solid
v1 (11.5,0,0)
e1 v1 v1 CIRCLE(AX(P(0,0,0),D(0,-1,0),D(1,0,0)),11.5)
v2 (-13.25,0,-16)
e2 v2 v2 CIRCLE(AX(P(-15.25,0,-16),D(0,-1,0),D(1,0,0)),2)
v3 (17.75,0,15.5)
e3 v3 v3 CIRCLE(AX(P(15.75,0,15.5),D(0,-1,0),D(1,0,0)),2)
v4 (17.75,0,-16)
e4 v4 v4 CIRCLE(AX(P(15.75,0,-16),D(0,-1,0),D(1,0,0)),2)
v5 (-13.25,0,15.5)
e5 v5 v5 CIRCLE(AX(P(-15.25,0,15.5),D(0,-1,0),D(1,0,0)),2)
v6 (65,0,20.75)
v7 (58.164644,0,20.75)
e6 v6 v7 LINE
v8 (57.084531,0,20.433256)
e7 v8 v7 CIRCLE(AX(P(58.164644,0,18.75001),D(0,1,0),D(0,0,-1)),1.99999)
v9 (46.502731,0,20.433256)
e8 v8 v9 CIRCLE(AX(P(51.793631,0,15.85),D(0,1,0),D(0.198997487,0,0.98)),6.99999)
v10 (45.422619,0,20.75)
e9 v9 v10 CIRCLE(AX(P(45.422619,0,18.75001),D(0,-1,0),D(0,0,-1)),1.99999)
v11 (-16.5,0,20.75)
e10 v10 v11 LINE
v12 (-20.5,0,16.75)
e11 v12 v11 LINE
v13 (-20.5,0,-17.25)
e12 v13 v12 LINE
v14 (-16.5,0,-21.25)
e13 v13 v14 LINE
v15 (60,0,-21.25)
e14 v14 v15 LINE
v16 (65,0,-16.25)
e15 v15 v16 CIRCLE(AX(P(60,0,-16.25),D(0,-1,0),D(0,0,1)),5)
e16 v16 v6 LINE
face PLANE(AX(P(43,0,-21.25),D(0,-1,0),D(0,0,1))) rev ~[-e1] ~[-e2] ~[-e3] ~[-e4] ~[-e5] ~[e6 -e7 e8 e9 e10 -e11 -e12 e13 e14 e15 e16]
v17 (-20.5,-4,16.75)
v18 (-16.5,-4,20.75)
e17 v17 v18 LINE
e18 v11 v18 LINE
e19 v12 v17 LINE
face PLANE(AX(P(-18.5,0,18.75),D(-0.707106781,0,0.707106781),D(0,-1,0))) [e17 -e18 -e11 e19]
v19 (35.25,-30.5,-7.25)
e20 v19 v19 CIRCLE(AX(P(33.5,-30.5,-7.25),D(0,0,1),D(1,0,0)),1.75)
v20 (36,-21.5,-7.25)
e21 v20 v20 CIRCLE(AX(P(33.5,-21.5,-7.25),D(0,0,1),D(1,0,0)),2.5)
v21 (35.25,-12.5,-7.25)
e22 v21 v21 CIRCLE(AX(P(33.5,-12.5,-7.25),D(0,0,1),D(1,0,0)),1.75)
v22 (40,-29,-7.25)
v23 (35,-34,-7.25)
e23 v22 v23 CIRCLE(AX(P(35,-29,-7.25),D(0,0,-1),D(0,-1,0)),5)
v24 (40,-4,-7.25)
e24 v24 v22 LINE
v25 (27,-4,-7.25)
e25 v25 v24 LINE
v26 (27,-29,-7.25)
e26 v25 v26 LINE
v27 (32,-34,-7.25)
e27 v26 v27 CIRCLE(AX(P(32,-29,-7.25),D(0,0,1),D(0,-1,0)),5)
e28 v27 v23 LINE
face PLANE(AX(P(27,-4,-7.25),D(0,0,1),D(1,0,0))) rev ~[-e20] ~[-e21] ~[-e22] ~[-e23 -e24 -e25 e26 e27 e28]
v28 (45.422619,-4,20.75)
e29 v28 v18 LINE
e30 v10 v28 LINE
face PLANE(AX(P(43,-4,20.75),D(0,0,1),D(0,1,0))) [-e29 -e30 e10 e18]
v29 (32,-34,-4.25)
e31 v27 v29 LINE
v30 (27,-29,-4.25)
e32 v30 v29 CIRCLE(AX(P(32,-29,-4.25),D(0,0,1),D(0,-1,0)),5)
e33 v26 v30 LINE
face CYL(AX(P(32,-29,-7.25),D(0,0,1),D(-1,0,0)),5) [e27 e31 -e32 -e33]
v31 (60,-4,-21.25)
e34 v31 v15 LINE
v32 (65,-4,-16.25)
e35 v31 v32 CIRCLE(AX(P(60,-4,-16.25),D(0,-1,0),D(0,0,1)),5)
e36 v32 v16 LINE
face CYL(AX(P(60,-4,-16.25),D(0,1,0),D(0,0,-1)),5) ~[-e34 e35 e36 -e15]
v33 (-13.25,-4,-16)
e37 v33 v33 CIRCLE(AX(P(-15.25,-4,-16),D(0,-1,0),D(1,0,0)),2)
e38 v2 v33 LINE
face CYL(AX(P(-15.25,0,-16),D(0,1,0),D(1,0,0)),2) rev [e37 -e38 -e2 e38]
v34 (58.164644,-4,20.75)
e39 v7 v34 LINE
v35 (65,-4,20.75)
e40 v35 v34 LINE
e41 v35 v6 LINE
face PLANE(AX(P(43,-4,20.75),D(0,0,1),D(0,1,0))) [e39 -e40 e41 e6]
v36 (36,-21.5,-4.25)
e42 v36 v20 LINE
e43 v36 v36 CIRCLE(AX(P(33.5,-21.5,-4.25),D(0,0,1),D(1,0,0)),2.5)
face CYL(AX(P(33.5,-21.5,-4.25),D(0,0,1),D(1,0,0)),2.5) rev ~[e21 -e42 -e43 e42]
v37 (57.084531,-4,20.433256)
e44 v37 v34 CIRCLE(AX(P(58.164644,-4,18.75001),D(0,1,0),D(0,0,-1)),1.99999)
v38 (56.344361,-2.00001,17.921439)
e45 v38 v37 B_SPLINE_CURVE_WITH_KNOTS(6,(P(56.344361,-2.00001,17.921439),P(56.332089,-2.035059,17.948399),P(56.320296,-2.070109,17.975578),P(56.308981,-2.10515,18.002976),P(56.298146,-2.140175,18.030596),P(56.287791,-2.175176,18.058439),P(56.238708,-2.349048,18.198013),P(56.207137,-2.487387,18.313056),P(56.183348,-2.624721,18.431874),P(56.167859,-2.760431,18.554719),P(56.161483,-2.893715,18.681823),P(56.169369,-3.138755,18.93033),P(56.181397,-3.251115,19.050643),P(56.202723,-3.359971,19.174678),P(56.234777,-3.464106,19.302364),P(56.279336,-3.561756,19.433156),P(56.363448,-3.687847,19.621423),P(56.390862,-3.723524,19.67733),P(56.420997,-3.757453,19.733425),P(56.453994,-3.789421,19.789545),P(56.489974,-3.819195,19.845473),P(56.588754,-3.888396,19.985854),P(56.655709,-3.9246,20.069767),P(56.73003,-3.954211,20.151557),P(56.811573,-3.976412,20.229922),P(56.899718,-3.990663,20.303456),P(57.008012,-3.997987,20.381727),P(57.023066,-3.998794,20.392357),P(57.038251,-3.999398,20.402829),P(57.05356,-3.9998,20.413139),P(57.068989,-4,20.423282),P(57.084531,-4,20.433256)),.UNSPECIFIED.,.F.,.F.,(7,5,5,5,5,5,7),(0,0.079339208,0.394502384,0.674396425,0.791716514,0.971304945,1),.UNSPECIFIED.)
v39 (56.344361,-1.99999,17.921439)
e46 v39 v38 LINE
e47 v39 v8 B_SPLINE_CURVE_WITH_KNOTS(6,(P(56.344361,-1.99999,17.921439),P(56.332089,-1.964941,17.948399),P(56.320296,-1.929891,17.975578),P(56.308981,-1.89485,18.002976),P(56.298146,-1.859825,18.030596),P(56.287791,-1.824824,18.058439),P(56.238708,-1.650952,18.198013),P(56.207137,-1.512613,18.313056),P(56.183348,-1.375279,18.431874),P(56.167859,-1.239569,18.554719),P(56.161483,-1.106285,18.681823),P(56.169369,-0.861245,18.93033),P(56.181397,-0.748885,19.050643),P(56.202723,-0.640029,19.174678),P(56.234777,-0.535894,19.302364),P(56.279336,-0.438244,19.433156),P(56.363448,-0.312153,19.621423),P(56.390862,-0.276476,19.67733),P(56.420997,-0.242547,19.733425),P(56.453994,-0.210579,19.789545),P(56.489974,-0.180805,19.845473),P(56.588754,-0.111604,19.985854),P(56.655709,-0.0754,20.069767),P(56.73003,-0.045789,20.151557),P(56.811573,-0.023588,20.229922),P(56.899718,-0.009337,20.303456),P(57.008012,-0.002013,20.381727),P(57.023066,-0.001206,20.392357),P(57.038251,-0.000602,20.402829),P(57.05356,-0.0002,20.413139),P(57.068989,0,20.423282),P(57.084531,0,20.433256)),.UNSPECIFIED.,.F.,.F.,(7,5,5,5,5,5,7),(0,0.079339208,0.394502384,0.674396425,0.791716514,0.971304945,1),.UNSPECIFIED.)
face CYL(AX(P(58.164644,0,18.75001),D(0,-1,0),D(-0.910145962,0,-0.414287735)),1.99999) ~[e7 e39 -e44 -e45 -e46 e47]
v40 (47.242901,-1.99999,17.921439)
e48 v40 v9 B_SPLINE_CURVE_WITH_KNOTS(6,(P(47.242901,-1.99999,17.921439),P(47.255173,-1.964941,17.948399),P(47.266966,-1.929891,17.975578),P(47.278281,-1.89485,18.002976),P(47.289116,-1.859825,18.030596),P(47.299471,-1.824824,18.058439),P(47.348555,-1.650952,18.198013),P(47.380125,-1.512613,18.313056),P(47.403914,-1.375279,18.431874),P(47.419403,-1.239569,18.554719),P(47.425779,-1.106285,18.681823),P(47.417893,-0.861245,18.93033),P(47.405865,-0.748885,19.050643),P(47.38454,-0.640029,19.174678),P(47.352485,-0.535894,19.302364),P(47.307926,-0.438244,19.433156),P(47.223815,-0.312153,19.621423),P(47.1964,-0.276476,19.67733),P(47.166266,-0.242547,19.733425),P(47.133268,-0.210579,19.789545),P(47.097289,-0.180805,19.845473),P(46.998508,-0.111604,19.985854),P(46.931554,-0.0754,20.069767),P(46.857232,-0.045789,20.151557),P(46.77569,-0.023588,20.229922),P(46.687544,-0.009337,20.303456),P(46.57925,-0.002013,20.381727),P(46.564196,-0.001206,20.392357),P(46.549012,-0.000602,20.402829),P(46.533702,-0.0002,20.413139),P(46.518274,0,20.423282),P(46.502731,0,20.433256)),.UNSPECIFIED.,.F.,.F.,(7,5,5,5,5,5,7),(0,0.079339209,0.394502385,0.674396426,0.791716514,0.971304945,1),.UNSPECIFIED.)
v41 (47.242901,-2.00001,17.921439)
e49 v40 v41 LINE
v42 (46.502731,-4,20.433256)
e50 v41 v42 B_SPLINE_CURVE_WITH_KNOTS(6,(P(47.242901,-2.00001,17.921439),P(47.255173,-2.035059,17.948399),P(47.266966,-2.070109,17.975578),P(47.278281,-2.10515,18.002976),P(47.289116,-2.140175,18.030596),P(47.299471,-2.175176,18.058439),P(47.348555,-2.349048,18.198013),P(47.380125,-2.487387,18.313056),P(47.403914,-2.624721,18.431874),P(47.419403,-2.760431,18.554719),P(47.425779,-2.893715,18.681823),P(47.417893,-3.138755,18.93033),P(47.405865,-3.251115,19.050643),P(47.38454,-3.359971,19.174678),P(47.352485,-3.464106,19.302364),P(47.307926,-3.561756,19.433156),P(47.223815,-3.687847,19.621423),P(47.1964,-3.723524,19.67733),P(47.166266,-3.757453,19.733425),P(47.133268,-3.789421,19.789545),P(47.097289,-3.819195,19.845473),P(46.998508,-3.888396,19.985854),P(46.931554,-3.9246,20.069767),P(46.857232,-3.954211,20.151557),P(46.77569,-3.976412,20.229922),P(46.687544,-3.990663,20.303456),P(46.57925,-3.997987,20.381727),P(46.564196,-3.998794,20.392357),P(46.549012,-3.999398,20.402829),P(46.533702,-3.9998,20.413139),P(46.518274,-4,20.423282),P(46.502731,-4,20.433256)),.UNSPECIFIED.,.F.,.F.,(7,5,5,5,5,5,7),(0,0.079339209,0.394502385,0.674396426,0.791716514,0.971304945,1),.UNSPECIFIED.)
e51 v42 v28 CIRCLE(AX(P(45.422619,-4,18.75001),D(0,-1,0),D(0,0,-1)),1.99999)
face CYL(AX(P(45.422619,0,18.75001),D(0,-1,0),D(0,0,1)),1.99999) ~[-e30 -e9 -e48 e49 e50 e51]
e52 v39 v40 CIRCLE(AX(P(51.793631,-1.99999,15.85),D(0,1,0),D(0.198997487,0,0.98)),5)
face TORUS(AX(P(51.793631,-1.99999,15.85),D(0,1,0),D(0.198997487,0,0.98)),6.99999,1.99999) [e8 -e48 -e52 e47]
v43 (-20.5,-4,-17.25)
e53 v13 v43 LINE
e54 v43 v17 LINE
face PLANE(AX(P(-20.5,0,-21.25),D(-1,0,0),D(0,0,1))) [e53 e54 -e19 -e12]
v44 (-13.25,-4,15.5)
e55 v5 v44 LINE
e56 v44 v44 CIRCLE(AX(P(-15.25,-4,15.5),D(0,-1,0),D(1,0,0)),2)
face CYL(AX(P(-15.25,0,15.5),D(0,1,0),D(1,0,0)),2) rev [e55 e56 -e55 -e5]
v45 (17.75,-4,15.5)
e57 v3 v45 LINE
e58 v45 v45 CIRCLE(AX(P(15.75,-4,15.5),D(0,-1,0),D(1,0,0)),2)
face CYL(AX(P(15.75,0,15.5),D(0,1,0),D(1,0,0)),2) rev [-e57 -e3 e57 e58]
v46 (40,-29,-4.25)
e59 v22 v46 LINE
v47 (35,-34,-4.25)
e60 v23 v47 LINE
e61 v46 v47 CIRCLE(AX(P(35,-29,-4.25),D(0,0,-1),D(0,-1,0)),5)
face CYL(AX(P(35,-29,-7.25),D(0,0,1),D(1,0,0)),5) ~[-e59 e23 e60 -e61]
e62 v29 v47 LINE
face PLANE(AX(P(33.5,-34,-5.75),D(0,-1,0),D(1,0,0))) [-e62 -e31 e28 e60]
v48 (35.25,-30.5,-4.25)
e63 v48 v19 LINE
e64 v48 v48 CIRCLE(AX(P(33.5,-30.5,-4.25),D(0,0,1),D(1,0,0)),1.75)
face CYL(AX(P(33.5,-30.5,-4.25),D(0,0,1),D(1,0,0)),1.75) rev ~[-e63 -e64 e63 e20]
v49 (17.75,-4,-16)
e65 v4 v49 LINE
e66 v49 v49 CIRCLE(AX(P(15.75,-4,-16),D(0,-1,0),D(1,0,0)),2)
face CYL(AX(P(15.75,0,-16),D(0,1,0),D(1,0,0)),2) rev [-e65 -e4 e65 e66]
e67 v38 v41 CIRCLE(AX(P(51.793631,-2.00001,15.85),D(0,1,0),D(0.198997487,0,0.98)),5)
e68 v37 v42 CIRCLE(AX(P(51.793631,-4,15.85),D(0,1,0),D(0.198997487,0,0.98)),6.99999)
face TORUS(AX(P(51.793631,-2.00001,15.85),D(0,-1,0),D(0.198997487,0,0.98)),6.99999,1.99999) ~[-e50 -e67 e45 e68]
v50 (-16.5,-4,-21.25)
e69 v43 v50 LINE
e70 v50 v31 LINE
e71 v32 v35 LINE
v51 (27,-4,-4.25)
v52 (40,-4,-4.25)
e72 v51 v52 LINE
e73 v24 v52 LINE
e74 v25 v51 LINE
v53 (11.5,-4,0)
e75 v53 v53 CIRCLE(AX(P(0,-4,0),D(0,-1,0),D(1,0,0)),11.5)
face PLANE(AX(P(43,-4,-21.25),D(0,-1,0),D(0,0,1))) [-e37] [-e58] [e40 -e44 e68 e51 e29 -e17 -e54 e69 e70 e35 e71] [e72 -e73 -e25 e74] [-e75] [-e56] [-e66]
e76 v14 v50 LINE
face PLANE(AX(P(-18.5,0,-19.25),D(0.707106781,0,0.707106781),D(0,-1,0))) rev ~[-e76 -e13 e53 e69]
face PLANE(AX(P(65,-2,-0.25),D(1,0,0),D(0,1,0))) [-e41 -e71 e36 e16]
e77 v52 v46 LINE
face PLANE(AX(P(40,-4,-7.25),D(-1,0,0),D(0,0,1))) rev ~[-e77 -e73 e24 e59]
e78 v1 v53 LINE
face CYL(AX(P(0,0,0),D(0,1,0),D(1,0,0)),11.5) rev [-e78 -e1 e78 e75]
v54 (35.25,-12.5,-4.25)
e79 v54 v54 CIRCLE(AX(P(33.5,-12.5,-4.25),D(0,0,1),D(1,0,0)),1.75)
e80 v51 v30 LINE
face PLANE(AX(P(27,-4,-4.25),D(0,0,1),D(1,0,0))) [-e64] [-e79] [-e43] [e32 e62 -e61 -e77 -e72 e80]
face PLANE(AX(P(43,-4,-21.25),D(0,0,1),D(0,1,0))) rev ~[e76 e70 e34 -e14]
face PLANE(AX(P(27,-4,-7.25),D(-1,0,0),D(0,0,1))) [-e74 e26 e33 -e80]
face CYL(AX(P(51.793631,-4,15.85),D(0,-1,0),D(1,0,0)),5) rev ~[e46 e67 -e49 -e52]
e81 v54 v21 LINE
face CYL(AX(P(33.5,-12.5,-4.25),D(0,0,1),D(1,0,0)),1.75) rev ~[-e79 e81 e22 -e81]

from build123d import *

# Parameters (mm, degrees)
F0_W      = 63.5
F0_H      = 42
F0_R      = 2
F0_R_2    = 11.5
F1_DEPTH  = 4
F2_SIZE   = 4
F3_W      = 13
F3_H      = 3
F4_DEPTH  = 30
F5_R      = 5
F6_R      = 2.5
F6_R_2    = 1.75
F7_DEPTH  = 3
F8_W      = 4
F8_H      = 42
F9_DEPTH  = 22
F10_R     = 5
F11_R     = 5
F12_DEPTH = 4
F13_R     = 1.99999


# Not quite as in the source:
# - a fillet or chamfer is up to 0.001 mm smaller than in the source, because OpenCascade refuses the exact size


with BuildPart() as f1:
    # F0 (on Front) → F1 (new body)
    with BuildSketch(Plane.XZ):
        with Locations((11.25, -0.25)):
            Rectangle(F0_W, F0_H)
        with Locations((-15.25, -16)):
            Circle(F0_R, mode=Mode.SUBTRACT)
        with Locations((15.75, -16)):
            Circle(F0_R, mode=Mode.SUBTRACT)
        Circle(F0_R_2, mode=Mode.SUBTRACT)
        with Locations((-15.25, 15.5)):
            Circle(F0_R, mode=Mode.SUBTRACT)
        with Locations((15.75, 15.5)):
            Circle(F0_R, mode=Mode.SUBTRACT)
    extrude(amount=F1_DEPTH)

    # F2
    f2_edges = [f1.edges().sort_by_distance(p)[0] for p in [
        (-20.5, -2, -21.25),
        (-20.5, -2, 20.75),
    ]]
    chamfer(f2_edges, length=F2_SIZE)

    # F3 (on face) → F4 (join)
    with BuildSketch(Plane.XZ.offset(4)):
        with Locations((33.5, -5.75)):
            Rectangle(F3_W, F3_H)
    extrude(amount=F4_DEPTH)

    # F5
    f5_edges = [f1.edges().sort_by_distance(p)[0] for p in [
        (40, -34, -5.75),
        (27, -34, -5.75),
    ]]
    fillet(f5_edges, radius=F5_R)

    # F6 (on face) → F7 (cut, through all)
    with BuildSketch(Plane.XY.offset(-4.25)):
        with Locations((33.5, -21.5)):
            Circle(F6_R)
        with Locations((33.5, -30.5)):
            Circle(F6_R_2)
        with Locations((33.5, -12.5)):
            Circle(F6_R_2)
    extrude(amount=-F7_DEPTH, mode=Mode.SUBTRACT)

    # F8 (on face) → F9 (join)
    with BuildSketch(Plane.YZ.offset(43)):
        with Locations((-2, -0.25)):
            Rectangle(F8_W, F8_H)
    extrude(amount=F9_DEPTH)

    # F10
    f10_edges = [f1.edges().sort_by_distance(p)[0] for p in [
        (65, -2, -21.25),
    ]]
    fillet(f10_edges, radius=F10_R)

    # F11 (on face) → F12 (cut, through all)
    with BuildSketch(Plane.XZ.offset(4)):
        with Locations((51.7936311662, 15.85)):
            Circle(F11_R)
    extrude(amount=-F12_DEPTH, mode=Mode.SUBTRACT)

    # F13 (radius 2 in the source; OpenCascade refuses exactly that, so slightly less here)
    f13_edges = [f1.edges().sort_by_distance(p)[0] for p in [
        (51.793631, -4, 10.85),
        (51.793631, 0, 10.85),
        (50.798644, -2, 20.75),
        (52.788619, -2, 20.75),
    ]]
    fillet(f13_edges, radius=F13_R)


solid = f1.part
